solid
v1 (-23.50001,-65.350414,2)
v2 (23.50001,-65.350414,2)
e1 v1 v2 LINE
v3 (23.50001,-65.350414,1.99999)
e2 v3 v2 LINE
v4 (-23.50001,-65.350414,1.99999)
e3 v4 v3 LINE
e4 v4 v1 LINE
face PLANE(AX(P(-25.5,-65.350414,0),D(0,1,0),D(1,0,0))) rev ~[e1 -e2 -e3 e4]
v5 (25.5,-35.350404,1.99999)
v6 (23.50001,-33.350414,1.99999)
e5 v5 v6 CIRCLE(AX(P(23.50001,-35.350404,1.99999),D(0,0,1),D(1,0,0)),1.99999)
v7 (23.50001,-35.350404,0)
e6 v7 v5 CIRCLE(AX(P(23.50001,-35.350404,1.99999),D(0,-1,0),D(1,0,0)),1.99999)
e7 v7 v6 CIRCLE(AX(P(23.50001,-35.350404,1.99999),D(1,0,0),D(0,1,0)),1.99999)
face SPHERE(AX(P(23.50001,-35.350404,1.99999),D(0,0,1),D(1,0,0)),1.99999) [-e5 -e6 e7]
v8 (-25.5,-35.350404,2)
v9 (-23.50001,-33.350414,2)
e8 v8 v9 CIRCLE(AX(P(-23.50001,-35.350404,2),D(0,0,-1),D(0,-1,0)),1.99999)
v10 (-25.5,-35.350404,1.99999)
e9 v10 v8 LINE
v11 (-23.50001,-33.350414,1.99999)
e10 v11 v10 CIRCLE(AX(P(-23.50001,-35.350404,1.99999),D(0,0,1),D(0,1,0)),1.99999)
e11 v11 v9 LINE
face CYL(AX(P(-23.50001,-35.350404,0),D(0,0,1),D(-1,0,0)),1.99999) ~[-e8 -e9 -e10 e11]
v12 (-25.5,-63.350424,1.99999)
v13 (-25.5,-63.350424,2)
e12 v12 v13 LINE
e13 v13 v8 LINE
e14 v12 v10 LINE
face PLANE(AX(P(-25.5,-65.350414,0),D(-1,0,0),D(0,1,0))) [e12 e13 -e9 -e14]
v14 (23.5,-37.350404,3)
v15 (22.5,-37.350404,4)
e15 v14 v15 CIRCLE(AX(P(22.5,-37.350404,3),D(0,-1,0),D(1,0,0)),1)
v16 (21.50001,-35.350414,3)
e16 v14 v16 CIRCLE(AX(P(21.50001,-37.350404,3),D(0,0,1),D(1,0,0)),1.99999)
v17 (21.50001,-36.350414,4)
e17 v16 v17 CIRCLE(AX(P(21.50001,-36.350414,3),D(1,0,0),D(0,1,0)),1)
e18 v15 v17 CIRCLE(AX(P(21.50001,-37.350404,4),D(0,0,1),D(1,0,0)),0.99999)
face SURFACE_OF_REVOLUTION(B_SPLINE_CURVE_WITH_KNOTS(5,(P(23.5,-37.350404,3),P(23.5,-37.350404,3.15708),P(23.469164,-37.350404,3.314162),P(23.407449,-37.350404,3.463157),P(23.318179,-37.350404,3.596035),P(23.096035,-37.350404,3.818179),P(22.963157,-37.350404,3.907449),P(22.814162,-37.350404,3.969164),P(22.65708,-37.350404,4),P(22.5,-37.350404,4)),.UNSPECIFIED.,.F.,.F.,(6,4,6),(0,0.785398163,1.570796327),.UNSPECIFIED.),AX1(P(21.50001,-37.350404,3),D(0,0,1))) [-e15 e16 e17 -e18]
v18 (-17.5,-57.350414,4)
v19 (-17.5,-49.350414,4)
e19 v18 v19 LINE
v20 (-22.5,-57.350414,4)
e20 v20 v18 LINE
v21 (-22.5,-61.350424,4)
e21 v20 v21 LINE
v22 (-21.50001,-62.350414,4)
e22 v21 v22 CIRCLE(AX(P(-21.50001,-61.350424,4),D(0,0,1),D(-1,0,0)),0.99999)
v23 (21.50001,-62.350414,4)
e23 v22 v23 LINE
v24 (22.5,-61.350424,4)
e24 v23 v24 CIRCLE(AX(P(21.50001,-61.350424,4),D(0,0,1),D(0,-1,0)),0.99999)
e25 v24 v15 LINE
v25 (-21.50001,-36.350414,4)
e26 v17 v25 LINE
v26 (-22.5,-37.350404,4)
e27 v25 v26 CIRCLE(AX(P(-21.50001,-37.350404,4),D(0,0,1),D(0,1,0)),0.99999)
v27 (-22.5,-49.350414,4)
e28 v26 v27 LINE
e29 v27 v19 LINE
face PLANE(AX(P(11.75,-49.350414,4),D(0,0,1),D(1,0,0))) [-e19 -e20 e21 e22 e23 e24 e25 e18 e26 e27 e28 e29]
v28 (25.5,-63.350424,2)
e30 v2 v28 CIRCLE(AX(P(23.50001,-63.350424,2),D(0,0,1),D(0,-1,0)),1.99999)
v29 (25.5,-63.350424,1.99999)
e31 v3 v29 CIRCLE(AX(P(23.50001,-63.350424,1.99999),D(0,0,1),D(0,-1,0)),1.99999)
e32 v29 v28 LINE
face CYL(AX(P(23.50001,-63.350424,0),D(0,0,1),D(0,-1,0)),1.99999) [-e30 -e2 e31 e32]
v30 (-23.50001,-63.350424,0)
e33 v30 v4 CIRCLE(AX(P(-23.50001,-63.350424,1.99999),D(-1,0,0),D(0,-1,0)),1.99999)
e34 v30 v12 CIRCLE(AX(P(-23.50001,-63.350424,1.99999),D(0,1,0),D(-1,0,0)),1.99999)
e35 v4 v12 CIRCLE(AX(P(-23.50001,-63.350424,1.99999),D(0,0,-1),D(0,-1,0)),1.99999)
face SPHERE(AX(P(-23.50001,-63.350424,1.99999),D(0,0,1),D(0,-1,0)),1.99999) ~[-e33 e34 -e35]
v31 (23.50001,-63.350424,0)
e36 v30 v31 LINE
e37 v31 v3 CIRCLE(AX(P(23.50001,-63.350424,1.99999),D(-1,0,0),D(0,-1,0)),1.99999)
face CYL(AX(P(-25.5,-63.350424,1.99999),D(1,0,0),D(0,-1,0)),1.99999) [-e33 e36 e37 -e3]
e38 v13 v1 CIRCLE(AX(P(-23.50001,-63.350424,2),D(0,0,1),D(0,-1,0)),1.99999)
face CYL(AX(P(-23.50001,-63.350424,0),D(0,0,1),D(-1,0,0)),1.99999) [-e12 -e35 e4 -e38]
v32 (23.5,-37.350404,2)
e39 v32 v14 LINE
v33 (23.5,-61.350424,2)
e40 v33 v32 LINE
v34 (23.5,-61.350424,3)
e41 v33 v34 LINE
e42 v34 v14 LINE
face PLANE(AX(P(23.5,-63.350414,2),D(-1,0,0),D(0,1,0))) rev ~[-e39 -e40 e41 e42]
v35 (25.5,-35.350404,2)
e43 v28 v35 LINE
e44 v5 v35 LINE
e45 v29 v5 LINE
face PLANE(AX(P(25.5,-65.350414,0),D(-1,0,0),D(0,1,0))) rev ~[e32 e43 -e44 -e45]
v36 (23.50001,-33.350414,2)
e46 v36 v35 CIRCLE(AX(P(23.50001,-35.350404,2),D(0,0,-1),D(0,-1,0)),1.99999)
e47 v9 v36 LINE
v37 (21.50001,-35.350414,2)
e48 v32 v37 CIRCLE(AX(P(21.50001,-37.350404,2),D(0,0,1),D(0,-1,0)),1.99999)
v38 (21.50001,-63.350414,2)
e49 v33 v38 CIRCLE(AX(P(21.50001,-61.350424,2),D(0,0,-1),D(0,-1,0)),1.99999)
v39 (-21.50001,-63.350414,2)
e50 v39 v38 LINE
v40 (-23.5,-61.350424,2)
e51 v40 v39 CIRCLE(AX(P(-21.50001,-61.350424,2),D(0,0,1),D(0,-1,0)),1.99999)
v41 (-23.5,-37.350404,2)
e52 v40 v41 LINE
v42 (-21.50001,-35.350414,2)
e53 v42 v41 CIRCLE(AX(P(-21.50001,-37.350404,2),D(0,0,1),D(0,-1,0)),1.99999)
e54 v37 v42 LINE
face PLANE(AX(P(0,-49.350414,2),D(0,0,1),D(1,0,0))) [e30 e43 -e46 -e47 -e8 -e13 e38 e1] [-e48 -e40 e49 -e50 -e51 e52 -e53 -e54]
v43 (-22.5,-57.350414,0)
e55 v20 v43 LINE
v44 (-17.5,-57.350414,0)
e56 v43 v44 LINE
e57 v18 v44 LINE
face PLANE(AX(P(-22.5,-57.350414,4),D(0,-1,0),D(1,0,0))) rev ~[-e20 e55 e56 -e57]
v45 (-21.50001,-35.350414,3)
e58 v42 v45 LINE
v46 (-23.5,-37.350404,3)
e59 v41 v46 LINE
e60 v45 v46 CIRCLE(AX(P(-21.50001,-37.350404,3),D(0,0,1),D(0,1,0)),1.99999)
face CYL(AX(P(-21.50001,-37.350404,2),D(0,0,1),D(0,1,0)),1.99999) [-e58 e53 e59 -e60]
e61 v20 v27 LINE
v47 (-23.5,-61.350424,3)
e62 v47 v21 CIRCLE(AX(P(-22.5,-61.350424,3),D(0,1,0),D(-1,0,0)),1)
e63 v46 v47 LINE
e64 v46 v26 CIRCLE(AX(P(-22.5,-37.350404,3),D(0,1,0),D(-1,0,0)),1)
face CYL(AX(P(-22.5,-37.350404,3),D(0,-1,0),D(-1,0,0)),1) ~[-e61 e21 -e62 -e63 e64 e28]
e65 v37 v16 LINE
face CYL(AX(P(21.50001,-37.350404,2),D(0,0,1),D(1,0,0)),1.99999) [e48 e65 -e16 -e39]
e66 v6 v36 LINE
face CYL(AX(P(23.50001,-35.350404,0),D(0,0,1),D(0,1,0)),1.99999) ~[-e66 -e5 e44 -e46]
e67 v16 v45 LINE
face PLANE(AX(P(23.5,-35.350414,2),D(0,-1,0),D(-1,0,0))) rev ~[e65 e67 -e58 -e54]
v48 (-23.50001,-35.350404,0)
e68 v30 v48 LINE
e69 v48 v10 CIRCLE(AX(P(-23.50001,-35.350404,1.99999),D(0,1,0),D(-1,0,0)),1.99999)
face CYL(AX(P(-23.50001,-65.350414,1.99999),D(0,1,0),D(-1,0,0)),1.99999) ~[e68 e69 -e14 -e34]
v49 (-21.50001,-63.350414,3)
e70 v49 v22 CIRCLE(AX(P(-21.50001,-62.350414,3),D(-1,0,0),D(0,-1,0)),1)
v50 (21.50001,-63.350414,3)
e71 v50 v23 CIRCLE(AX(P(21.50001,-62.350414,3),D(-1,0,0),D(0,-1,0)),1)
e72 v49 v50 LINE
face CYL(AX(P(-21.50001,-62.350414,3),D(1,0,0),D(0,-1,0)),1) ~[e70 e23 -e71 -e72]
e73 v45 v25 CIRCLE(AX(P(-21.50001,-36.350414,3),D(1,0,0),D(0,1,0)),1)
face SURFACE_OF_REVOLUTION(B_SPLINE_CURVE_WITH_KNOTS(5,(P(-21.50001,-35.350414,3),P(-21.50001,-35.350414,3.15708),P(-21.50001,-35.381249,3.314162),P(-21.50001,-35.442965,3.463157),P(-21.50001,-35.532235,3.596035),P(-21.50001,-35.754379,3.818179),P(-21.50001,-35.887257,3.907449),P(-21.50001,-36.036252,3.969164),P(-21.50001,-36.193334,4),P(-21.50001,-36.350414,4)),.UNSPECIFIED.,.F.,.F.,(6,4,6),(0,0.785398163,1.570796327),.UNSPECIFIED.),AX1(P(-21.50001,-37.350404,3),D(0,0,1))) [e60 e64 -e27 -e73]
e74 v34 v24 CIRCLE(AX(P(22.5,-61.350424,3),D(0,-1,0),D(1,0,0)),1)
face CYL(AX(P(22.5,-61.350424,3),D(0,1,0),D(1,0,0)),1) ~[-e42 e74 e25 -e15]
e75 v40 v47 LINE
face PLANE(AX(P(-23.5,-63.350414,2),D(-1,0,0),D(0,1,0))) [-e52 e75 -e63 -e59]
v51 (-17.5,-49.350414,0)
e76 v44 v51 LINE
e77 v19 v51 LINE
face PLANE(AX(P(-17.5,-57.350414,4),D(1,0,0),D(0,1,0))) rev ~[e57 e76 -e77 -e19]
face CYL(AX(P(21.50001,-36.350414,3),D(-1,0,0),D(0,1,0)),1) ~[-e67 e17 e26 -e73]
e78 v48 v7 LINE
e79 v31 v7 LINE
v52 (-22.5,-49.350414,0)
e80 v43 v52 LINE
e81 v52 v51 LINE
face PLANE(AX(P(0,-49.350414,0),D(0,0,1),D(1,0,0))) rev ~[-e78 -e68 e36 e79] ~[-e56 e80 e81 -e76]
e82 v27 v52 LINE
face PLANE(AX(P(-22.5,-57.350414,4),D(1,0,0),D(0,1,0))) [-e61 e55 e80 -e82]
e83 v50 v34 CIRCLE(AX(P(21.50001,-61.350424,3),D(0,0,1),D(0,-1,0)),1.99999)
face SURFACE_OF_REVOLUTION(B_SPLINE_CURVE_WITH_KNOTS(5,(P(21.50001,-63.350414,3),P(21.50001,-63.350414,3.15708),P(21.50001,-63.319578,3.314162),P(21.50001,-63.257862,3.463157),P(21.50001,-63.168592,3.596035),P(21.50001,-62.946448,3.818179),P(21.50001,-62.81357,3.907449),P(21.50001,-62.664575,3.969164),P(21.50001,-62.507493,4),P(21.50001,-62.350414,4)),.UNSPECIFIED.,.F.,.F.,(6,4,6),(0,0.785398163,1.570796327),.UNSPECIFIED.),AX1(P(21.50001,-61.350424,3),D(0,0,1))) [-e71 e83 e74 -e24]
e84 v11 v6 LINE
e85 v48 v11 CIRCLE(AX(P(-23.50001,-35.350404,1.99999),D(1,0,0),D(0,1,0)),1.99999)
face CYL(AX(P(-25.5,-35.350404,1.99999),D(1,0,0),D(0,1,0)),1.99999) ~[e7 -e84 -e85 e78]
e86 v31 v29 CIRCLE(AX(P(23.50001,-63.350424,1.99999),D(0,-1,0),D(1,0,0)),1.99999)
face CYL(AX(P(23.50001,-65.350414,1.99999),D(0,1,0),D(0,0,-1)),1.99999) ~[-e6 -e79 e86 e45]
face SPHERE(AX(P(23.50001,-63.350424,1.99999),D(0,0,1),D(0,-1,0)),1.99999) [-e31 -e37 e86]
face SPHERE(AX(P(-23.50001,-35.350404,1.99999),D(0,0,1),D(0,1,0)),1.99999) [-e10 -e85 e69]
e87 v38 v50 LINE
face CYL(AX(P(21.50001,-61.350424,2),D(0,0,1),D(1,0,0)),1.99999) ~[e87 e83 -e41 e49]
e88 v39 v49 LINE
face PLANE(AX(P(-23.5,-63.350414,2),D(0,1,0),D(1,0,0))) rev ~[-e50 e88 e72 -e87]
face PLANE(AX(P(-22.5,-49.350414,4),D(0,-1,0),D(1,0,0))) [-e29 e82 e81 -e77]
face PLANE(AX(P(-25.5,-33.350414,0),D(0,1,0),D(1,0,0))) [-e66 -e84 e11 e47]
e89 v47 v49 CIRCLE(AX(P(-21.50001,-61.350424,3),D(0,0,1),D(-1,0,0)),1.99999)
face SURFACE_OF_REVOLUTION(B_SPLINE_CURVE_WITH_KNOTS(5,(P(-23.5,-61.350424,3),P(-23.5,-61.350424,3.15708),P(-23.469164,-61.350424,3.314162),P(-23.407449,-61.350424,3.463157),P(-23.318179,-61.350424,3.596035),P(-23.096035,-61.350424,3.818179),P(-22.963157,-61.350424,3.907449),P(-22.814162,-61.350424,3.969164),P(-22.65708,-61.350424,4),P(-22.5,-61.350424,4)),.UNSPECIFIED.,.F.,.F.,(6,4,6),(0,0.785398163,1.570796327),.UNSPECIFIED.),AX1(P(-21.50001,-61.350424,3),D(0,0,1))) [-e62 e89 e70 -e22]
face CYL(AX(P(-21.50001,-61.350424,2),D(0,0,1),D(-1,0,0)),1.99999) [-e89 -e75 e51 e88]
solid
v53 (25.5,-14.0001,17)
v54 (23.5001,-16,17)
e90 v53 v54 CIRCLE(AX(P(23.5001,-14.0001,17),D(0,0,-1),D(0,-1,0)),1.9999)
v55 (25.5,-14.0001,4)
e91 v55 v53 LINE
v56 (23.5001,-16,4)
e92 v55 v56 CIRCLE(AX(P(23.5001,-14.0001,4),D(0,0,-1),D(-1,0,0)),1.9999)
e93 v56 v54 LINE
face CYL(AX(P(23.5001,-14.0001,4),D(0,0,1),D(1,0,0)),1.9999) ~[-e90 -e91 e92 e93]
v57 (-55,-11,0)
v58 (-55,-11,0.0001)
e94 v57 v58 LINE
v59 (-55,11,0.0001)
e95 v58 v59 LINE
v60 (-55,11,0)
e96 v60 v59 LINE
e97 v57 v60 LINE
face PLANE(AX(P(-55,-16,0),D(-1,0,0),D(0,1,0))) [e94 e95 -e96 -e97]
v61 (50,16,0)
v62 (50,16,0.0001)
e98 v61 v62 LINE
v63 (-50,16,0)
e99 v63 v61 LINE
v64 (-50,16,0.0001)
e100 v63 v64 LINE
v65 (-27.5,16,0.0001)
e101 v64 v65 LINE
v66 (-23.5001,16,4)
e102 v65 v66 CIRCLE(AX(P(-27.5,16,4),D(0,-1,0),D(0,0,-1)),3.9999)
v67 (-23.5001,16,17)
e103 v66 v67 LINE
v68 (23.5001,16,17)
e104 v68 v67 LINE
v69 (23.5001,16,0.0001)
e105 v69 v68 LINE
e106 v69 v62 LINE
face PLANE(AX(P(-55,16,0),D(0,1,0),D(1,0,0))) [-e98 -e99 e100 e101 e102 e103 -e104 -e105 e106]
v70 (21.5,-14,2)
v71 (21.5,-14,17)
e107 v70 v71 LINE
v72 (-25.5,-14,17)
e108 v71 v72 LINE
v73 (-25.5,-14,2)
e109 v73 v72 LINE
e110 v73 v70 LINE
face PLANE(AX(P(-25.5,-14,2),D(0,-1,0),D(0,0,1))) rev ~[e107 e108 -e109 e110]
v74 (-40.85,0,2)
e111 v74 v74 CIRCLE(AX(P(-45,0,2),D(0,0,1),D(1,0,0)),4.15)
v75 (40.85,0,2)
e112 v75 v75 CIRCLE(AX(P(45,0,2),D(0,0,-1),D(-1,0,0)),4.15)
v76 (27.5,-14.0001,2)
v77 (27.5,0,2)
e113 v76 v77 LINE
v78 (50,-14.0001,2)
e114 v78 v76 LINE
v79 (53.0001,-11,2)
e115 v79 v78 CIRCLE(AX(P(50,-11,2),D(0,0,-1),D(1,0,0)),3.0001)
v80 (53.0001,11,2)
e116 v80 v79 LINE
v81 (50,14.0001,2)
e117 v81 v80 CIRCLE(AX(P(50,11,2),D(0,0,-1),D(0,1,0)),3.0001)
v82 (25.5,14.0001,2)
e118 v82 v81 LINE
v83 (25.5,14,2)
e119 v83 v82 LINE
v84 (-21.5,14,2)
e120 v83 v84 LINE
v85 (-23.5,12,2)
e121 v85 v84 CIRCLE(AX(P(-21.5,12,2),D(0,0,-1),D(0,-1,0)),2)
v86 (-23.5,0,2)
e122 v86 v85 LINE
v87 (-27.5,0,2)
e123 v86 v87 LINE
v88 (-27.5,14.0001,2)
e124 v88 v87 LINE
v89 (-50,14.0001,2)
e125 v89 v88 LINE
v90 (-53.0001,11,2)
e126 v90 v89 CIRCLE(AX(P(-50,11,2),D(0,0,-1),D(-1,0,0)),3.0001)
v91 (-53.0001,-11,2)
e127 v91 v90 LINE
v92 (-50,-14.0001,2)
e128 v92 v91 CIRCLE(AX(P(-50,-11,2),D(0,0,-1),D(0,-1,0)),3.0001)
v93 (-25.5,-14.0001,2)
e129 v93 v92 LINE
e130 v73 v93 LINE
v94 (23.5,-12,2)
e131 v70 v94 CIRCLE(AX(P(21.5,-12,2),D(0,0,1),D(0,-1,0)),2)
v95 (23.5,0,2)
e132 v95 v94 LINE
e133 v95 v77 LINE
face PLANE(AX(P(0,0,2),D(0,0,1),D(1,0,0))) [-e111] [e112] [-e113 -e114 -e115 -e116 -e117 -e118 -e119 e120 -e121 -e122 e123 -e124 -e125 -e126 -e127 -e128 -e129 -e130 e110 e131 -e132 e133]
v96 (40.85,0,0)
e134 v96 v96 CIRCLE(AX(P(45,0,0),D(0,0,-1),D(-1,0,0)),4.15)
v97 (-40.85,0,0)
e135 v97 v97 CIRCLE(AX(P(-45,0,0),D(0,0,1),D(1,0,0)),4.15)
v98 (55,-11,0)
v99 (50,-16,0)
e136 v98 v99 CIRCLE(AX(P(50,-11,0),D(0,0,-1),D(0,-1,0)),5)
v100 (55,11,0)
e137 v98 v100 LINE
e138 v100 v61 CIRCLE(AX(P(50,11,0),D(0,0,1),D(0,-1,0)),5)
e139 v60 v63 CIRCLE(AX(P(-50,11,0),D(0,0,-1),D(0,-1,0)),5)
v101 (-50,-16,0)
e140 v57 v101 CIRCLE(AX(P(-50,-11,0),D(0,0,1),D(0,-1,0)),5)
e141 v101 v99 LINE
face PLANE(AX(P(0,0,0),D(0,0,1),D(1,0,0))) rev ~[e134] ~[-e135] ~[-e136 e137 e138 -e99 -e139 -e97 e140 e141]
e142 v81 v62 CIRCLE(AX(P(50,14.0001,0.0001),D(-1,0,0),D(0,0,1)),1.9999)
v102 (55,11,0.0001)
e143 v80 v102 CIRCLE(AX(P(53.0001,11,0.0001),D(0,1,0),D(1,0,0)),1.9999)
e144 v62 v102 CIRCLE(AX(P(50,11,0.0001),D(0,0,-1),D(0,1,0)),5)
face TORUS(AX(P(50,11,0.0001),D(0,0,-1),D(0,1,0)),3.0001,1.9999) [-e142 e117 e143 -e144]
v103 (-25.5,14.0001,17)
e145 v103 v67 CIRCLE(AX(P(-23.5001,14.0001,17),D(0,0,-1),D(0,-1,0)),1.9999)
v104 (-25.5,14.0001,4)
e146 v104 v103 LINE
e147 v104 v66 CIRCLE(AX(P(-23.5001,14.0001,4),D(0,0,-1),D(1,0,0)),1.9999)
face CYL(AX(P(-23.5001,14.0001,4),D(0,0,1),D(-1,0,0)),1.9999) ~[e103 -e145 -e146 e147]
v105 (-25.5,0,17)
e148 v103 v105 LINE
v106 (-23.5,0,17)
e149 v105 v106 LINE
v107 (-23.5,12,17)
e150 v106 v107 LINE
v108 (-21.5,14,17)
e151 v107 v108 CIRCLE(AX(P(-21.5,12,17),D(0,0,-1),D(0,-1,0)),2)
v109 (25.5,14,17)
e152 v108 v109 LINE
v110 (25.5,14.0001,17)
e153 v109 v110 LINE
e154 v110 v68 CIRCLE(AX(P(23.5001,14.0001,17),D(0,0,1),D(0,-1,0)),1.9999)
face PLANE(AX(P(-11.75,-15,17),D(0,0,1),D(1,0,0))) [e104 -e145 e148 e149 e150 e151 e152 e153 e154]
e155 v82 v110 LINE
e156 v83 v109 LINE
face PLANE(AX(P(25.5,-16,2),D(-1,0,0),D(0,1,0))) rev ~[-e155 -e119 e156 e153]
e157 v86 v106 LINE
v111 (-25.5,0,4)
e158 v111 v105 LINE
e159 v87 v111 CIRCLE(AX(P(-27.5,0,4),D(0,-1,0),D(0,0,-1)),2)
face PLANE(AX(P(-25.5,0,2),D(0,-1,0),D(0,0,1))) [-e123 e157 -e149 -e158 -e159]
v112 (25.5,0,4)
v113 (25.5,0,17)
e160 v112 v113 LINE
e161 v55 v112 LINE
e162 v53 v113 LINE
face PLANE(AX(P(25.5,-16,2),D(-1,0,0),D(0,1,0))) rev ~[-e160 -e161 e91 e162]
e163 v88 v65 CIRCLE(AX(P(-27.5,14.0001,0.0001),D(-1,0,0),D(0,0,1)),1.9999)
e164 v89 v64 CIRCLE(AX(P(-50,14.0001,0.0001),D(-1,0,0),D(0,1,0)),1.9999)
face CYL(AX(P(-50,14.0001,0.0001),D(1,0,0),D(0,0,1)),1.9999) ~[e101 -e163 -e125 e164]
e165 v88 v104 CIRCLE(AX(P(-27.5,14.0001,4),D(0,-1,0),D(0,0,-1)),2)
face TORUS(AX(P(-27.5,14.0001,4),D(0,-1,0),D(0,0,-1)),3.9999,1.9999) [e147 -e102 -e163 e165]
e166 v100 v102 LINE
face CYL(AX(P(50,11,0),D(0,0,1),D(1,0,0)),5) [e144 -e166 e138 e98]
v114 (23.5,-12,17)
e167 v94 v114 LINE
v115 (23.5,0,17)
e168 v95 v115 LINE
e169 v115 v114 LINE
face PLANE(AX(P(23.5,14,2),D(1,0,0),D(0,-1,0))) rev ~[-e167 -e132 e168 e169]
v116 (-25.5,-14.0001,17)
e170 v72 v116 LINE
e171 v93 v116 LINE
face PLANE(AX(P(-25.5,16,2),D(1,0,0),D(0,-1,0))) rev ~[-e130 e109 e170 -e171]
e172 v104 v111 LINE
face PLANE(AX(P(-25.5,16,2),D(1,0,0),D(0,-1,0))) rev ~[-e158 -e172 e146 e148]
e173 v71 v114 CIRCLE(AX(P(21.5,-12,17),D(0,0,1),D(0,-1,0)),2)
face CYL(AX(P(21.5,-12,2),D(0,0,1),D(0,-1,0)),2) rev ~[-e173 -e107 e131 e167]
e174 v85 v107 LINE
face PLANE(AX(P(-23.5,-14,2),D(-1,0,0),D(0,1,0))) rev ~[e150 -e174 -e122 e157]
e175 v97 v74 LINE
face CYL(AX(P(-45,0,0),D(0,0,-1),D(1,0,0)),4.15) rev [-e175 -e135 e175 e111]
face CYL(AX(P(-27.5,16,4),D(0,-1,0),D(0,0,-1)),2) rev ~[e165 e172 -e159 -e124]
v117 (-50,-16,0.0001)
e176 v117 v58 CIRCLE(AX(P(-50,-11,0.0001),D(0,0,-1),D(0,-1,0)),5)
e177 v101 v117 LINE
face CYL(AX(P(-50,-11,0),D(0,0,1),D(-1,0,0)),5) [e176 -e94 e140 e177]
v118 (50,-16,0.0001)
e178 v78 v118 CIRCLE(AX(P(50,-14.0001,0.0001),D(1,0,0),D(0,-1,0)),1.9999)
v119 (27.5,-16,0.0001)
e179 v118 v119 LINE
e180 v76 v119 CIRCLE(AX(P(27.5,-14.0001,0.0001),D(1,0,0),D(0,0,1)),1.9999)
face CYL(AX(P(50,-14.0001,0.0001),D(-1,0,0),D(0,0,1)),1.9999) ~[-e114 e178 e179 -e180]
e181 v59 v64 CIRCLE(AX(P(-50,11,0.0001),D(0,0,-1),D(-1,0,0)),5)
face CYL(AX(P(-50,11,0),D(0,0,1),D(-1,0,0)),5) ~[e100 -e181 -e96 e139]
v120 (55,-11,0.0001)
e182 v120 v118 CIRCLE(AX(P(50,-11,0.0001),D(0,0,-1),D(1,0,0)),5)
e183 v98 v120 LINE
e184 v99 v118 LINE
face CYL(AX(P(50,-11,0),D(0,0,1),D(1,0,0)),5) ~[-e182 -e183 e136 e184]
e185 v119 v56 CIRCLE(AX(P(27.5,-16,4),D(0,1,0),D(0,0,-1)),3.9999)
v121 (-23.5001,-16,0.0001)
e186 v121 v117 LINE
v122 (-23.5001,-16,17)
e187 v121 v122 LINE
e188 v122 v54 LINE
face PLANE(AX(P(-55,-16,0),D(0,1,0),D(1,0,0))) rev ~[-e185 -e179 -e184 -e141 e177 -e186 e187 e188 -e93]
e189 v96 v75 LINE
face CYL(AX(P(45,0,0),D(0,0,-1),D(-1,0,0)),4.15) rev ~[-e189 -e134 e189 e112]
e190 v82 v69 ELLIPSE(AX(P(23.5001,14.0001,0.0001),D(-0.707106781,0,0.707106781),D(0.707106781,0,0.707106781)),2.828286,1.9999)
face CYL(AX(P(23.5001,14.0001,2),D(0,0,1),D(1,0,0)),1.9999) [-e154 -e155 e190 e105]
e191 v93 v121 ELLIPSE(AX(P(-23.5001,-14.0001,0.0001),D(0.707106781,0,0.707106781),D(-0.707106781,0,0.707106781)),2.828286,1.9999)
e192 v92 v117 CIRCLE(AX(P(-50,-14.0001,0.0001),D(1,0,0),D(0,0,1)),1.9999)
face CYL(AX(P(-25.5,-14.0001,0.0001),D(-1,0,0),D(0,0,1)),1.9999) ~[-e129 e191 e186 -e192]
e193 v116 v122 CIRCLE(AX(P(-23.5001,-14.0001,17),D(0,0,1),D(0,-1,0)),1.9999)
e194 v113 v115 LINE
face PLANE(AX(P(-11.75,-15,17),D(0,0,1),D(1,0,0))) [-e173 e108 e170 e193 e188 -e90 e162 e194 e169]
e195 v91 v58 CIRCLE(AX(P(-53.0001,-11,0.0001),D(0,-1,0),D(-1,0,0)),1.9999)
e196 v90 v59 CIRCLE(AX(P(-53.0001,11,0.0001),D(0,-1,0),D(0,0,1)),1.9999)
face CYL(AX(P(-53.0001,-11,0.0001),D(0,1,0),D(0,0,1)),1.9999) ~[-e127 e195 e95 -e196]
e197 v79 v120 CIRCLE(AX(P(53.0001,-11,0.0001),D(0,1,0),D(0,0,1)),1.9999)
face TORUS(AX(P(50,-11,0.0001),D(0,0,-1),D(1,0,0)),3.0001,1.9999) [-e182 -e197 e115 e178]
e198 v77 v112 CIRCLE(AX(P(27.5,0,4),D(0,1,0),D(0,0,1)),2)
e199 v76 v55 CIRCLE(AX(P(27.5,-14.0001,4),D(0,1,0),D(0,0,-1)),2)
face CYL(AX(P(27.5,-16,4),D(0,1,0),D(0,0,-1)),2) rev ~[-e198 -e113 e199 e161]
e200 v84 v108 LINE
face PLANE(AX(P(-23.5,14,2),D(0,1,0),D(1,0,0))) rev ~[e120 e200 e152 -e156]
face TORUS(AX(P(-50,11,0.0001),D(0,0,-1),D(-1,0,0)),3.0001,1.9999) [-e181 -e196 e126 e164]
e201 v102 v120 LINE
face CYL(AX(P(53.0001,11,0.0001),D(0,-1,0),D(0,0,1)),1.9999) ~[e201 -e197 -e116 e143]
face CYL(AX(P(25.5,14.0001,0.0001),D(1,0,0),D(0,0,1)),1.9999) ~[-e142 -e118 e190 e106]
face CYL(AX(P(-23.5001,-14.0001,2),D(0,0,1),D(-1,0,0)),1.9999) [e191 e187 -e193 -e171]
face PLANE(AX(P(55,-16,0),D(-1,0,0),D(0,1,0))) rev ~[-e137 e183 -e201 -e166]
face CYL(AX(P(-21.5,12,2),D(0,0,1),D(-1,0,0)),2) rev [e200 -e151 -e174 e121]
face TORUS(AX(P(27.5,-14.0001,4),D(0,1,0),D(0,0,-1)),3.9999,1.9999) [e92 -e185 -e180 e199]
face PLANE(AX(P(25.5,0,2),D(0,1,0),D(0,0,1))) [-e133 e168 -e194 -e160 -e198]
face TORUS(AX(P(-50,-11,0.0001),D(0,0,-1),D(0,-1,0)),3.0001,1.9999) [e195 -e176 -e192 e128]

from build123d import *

# Parameters (mm, degrees)
F0_W      = 110
F0_H      = 32
F0_R      = 4.15
F1_DEPTH  = 2
F2_W      = 23.5
F2_H      = 2
F3_DEPTH  = 15
F4_W      = 14
F4_H      = 15
F5_DEPTH  = 2
F6_W      = 14
F6_H      = 15
F7_DEPTH  = 2
F8_R      = 5
F9_F1_R   = 2
F9_F2_R   = 1.9999
F10_W     = 51
F10_H     = 32
F10_W_2   = 47
F10_H_2   = 28
F11_DEPTH = 2
F12_W     = 23.5
F12_H     = 28
F13_DEPTH = 2
F14_R     = 1.99999
F15_R     = 1
F16_W     = 5
F16_H     = 8
F17_DEPTH = 25


# Not quite as in the source:
# - a fillet or chamfer is up to 0.001 mm smaller than in the source, because OpenCascade refuses the exact size


with BuildPart() as f1:
    # F0 (on Top) → F1 (new body)
    with BuildSketch(Plane.XY):
        Rectangle(F0_W, F0_H)
        with Locations((-45, 0)):
            Circle(F0_R, mode=Mode.SUBTRACT)
        with BuildLine():
            ThreePointArc((49.15, 0), (45, -4.15), (40.85, 0))
            ThreePointArc((40.85, 0), (45, 4.15), (49.15, 0))
        make_face(mode=Mode.SUBTRACT)
    extrude(amount=F1_DEPTH)

    # F2 (on face) → F3 (join)
    with BuildSketch(Plane.XY.offset(2)):
        with Locations((-11.75, -15)):
            Rectangle(F2_W, F2_H)
        with Locations((11.75, -15)):
            Rectangle(F2_W, F2_H)
        Polygon((23.5, -14), (23.5, -16), (25.5, -16), (25.5, 16), (23.5, 16), (23.5, 14), align=None)
        Polygon((-25.5, -16), (-23.5, -16), (-23.5, -14), (-23.5, 14), (-23.5, 16), (-25.5, 16), align=None)
        with Locations((-11.75, 15)):
            Rectangle(F2_W, F2_H)
        with Locations((11.75, 15)):
            Rectangle(F2_W, F2_H)
    extrude(amount=F3_DEPTH)

    # F4 (on face) → F5 (cut, through all)
    with BuildSketch(Plane(origin=(-25.5, 0, 0), x_dir=(0, -1, 0), z_dir=(-1, 0, 0))):
        with Locations((7, 9.5)):
            Rectangle(F4_W, F4_H)
    extrude(amount=-F5_DEPTH, mode=Mode.SUBTRACT)

    # F6 (on face) → F7 (cut, through all)
    with BuildSketch(Plane.YZ.offset(25.5)):
        with Locations((7, 9.5)):
            Rectangle(F6_W, F6_H)
    extrude(amount=-F7_DEPTH, mode=Mode.SUBTRACT)

    # F8
    f8_edges = [f1.edges().sort_by_distance(p)[0] for p in [
        (-55, -16, 1),
        (-55, 16, 1),
        (55, -16, 1),
        (55, 16, 1),
    ]]
    fillet(f8_edges, radius=F8_R)

    # F9: fillet of radius 2 on 8 edges, made by hand

    # F9_f1
    f9_f1_edges = [f1.edges().sort_by_distance(p)[0] for p in [
        (23.5, -14, 9.5),
        (-23.5, 14, 9.5),
        (-25.5, 8, 2),
        (25.5, -8, 2),
    ]]
    fillet(f9_f1_edges, radius=F9_F1_R)

    # F9_f2 (radius 2 in the source; OpenCascade refuses exactly that, so slightly less here)
    f9_f2_edges = [f1.edges().sort_by_distance(p)[0] for p in [
        (25.5, -16, 10.5),
        (-25.5, 16, 10.5),
        (25.5, 16, 9.5),
        (-25.5, -16, 9.5),
        (-26.0857864376, 16, 2.5857864376),
        (26.0857864376, -16, 2.5857864376),
    ]]
    fillet(f9_f2_edges, radius=F9_F2_R)


with BuildPart() as f11:
    # F10 (on Top) → F11 (new body)
    with BuildSketch(Plane.XY):
        with Locations((0, -49.3504135075)):
            Rectangle(F10_W, F10_H)
        with Locations((0, -49.3504135075)):
            Rectangle(F10_W_2, F10_H_2, mode=Mode.SUBTRACT)
        with Locations((0, -49.3504135075)):
            Rectangle(F10_W_2, F10_H_2)
    extrude(amount=F11_DEPTH)

    # F12 (on face) → F13 (join)
    with BuildSketch(Plane.XY.offset(2)):
        with Locations((11.75, -49.3504135075)):
            Rectangle(F12_W, F12_H)
        with Locations((-11.75, -49.3504135075)):
            Rectangle(F12_W, F12_H)
    extrude(amount=F13_DEPTH)

    # F14 (radius 2 in the source; OpenCascade refuses exactly that, so slightly less here)
    f14_edges = [f11.edges().sort_by_distance(p)[0] for p in [
        (-23.5, -63.350414, 3),
        (-25.5, -65.350414, 1),
        (23.5, -63.350414, 3),
        (23.5, -35.350414, 3),
        (-23.5, -35.350414, 3),
        (-25.5, -33.350414, 1),
        (25.5, -33.350414, 1),
        (25.5, -65.350414, 1),
        (0, -65.350414, 0),
        (25.5, -49.350414, 0),
        (0, -33.350414, 0),
        (-25.5, -49.350414, 0),
    ]]
    fillet(f14_edges, radius=F14_R)

    # F15
    f15_edges = [f11.edges().sort_by_distance(p)[0] for p in [
        (23.5, -49.350414, 4),
        (22.914216, -62.76463, 4),
        (22.914216, -35.936197, 4),
        (0, -63.350414, 4),
        (0, -35.350414, 4),
        (-22.914216, -62.76463, 4),
        (-22.914216, -35.936197, 4),
        (-23.5, -49.350414, 4),
    ]]
    fillet(f15_edges, radius=F15_R)

    # F16 (on face) → F17 (cut)
    with BuildSketch(Plane.XY.offset(4)):
        with Locations((-20, -53.3504135075)):
            Rectangle(F16_W, F16_H)
    extrude(amount=-F17_DEPTH, mode=Mode.SUBTRACT)


solid = Compound([f1.part, f11.part])
